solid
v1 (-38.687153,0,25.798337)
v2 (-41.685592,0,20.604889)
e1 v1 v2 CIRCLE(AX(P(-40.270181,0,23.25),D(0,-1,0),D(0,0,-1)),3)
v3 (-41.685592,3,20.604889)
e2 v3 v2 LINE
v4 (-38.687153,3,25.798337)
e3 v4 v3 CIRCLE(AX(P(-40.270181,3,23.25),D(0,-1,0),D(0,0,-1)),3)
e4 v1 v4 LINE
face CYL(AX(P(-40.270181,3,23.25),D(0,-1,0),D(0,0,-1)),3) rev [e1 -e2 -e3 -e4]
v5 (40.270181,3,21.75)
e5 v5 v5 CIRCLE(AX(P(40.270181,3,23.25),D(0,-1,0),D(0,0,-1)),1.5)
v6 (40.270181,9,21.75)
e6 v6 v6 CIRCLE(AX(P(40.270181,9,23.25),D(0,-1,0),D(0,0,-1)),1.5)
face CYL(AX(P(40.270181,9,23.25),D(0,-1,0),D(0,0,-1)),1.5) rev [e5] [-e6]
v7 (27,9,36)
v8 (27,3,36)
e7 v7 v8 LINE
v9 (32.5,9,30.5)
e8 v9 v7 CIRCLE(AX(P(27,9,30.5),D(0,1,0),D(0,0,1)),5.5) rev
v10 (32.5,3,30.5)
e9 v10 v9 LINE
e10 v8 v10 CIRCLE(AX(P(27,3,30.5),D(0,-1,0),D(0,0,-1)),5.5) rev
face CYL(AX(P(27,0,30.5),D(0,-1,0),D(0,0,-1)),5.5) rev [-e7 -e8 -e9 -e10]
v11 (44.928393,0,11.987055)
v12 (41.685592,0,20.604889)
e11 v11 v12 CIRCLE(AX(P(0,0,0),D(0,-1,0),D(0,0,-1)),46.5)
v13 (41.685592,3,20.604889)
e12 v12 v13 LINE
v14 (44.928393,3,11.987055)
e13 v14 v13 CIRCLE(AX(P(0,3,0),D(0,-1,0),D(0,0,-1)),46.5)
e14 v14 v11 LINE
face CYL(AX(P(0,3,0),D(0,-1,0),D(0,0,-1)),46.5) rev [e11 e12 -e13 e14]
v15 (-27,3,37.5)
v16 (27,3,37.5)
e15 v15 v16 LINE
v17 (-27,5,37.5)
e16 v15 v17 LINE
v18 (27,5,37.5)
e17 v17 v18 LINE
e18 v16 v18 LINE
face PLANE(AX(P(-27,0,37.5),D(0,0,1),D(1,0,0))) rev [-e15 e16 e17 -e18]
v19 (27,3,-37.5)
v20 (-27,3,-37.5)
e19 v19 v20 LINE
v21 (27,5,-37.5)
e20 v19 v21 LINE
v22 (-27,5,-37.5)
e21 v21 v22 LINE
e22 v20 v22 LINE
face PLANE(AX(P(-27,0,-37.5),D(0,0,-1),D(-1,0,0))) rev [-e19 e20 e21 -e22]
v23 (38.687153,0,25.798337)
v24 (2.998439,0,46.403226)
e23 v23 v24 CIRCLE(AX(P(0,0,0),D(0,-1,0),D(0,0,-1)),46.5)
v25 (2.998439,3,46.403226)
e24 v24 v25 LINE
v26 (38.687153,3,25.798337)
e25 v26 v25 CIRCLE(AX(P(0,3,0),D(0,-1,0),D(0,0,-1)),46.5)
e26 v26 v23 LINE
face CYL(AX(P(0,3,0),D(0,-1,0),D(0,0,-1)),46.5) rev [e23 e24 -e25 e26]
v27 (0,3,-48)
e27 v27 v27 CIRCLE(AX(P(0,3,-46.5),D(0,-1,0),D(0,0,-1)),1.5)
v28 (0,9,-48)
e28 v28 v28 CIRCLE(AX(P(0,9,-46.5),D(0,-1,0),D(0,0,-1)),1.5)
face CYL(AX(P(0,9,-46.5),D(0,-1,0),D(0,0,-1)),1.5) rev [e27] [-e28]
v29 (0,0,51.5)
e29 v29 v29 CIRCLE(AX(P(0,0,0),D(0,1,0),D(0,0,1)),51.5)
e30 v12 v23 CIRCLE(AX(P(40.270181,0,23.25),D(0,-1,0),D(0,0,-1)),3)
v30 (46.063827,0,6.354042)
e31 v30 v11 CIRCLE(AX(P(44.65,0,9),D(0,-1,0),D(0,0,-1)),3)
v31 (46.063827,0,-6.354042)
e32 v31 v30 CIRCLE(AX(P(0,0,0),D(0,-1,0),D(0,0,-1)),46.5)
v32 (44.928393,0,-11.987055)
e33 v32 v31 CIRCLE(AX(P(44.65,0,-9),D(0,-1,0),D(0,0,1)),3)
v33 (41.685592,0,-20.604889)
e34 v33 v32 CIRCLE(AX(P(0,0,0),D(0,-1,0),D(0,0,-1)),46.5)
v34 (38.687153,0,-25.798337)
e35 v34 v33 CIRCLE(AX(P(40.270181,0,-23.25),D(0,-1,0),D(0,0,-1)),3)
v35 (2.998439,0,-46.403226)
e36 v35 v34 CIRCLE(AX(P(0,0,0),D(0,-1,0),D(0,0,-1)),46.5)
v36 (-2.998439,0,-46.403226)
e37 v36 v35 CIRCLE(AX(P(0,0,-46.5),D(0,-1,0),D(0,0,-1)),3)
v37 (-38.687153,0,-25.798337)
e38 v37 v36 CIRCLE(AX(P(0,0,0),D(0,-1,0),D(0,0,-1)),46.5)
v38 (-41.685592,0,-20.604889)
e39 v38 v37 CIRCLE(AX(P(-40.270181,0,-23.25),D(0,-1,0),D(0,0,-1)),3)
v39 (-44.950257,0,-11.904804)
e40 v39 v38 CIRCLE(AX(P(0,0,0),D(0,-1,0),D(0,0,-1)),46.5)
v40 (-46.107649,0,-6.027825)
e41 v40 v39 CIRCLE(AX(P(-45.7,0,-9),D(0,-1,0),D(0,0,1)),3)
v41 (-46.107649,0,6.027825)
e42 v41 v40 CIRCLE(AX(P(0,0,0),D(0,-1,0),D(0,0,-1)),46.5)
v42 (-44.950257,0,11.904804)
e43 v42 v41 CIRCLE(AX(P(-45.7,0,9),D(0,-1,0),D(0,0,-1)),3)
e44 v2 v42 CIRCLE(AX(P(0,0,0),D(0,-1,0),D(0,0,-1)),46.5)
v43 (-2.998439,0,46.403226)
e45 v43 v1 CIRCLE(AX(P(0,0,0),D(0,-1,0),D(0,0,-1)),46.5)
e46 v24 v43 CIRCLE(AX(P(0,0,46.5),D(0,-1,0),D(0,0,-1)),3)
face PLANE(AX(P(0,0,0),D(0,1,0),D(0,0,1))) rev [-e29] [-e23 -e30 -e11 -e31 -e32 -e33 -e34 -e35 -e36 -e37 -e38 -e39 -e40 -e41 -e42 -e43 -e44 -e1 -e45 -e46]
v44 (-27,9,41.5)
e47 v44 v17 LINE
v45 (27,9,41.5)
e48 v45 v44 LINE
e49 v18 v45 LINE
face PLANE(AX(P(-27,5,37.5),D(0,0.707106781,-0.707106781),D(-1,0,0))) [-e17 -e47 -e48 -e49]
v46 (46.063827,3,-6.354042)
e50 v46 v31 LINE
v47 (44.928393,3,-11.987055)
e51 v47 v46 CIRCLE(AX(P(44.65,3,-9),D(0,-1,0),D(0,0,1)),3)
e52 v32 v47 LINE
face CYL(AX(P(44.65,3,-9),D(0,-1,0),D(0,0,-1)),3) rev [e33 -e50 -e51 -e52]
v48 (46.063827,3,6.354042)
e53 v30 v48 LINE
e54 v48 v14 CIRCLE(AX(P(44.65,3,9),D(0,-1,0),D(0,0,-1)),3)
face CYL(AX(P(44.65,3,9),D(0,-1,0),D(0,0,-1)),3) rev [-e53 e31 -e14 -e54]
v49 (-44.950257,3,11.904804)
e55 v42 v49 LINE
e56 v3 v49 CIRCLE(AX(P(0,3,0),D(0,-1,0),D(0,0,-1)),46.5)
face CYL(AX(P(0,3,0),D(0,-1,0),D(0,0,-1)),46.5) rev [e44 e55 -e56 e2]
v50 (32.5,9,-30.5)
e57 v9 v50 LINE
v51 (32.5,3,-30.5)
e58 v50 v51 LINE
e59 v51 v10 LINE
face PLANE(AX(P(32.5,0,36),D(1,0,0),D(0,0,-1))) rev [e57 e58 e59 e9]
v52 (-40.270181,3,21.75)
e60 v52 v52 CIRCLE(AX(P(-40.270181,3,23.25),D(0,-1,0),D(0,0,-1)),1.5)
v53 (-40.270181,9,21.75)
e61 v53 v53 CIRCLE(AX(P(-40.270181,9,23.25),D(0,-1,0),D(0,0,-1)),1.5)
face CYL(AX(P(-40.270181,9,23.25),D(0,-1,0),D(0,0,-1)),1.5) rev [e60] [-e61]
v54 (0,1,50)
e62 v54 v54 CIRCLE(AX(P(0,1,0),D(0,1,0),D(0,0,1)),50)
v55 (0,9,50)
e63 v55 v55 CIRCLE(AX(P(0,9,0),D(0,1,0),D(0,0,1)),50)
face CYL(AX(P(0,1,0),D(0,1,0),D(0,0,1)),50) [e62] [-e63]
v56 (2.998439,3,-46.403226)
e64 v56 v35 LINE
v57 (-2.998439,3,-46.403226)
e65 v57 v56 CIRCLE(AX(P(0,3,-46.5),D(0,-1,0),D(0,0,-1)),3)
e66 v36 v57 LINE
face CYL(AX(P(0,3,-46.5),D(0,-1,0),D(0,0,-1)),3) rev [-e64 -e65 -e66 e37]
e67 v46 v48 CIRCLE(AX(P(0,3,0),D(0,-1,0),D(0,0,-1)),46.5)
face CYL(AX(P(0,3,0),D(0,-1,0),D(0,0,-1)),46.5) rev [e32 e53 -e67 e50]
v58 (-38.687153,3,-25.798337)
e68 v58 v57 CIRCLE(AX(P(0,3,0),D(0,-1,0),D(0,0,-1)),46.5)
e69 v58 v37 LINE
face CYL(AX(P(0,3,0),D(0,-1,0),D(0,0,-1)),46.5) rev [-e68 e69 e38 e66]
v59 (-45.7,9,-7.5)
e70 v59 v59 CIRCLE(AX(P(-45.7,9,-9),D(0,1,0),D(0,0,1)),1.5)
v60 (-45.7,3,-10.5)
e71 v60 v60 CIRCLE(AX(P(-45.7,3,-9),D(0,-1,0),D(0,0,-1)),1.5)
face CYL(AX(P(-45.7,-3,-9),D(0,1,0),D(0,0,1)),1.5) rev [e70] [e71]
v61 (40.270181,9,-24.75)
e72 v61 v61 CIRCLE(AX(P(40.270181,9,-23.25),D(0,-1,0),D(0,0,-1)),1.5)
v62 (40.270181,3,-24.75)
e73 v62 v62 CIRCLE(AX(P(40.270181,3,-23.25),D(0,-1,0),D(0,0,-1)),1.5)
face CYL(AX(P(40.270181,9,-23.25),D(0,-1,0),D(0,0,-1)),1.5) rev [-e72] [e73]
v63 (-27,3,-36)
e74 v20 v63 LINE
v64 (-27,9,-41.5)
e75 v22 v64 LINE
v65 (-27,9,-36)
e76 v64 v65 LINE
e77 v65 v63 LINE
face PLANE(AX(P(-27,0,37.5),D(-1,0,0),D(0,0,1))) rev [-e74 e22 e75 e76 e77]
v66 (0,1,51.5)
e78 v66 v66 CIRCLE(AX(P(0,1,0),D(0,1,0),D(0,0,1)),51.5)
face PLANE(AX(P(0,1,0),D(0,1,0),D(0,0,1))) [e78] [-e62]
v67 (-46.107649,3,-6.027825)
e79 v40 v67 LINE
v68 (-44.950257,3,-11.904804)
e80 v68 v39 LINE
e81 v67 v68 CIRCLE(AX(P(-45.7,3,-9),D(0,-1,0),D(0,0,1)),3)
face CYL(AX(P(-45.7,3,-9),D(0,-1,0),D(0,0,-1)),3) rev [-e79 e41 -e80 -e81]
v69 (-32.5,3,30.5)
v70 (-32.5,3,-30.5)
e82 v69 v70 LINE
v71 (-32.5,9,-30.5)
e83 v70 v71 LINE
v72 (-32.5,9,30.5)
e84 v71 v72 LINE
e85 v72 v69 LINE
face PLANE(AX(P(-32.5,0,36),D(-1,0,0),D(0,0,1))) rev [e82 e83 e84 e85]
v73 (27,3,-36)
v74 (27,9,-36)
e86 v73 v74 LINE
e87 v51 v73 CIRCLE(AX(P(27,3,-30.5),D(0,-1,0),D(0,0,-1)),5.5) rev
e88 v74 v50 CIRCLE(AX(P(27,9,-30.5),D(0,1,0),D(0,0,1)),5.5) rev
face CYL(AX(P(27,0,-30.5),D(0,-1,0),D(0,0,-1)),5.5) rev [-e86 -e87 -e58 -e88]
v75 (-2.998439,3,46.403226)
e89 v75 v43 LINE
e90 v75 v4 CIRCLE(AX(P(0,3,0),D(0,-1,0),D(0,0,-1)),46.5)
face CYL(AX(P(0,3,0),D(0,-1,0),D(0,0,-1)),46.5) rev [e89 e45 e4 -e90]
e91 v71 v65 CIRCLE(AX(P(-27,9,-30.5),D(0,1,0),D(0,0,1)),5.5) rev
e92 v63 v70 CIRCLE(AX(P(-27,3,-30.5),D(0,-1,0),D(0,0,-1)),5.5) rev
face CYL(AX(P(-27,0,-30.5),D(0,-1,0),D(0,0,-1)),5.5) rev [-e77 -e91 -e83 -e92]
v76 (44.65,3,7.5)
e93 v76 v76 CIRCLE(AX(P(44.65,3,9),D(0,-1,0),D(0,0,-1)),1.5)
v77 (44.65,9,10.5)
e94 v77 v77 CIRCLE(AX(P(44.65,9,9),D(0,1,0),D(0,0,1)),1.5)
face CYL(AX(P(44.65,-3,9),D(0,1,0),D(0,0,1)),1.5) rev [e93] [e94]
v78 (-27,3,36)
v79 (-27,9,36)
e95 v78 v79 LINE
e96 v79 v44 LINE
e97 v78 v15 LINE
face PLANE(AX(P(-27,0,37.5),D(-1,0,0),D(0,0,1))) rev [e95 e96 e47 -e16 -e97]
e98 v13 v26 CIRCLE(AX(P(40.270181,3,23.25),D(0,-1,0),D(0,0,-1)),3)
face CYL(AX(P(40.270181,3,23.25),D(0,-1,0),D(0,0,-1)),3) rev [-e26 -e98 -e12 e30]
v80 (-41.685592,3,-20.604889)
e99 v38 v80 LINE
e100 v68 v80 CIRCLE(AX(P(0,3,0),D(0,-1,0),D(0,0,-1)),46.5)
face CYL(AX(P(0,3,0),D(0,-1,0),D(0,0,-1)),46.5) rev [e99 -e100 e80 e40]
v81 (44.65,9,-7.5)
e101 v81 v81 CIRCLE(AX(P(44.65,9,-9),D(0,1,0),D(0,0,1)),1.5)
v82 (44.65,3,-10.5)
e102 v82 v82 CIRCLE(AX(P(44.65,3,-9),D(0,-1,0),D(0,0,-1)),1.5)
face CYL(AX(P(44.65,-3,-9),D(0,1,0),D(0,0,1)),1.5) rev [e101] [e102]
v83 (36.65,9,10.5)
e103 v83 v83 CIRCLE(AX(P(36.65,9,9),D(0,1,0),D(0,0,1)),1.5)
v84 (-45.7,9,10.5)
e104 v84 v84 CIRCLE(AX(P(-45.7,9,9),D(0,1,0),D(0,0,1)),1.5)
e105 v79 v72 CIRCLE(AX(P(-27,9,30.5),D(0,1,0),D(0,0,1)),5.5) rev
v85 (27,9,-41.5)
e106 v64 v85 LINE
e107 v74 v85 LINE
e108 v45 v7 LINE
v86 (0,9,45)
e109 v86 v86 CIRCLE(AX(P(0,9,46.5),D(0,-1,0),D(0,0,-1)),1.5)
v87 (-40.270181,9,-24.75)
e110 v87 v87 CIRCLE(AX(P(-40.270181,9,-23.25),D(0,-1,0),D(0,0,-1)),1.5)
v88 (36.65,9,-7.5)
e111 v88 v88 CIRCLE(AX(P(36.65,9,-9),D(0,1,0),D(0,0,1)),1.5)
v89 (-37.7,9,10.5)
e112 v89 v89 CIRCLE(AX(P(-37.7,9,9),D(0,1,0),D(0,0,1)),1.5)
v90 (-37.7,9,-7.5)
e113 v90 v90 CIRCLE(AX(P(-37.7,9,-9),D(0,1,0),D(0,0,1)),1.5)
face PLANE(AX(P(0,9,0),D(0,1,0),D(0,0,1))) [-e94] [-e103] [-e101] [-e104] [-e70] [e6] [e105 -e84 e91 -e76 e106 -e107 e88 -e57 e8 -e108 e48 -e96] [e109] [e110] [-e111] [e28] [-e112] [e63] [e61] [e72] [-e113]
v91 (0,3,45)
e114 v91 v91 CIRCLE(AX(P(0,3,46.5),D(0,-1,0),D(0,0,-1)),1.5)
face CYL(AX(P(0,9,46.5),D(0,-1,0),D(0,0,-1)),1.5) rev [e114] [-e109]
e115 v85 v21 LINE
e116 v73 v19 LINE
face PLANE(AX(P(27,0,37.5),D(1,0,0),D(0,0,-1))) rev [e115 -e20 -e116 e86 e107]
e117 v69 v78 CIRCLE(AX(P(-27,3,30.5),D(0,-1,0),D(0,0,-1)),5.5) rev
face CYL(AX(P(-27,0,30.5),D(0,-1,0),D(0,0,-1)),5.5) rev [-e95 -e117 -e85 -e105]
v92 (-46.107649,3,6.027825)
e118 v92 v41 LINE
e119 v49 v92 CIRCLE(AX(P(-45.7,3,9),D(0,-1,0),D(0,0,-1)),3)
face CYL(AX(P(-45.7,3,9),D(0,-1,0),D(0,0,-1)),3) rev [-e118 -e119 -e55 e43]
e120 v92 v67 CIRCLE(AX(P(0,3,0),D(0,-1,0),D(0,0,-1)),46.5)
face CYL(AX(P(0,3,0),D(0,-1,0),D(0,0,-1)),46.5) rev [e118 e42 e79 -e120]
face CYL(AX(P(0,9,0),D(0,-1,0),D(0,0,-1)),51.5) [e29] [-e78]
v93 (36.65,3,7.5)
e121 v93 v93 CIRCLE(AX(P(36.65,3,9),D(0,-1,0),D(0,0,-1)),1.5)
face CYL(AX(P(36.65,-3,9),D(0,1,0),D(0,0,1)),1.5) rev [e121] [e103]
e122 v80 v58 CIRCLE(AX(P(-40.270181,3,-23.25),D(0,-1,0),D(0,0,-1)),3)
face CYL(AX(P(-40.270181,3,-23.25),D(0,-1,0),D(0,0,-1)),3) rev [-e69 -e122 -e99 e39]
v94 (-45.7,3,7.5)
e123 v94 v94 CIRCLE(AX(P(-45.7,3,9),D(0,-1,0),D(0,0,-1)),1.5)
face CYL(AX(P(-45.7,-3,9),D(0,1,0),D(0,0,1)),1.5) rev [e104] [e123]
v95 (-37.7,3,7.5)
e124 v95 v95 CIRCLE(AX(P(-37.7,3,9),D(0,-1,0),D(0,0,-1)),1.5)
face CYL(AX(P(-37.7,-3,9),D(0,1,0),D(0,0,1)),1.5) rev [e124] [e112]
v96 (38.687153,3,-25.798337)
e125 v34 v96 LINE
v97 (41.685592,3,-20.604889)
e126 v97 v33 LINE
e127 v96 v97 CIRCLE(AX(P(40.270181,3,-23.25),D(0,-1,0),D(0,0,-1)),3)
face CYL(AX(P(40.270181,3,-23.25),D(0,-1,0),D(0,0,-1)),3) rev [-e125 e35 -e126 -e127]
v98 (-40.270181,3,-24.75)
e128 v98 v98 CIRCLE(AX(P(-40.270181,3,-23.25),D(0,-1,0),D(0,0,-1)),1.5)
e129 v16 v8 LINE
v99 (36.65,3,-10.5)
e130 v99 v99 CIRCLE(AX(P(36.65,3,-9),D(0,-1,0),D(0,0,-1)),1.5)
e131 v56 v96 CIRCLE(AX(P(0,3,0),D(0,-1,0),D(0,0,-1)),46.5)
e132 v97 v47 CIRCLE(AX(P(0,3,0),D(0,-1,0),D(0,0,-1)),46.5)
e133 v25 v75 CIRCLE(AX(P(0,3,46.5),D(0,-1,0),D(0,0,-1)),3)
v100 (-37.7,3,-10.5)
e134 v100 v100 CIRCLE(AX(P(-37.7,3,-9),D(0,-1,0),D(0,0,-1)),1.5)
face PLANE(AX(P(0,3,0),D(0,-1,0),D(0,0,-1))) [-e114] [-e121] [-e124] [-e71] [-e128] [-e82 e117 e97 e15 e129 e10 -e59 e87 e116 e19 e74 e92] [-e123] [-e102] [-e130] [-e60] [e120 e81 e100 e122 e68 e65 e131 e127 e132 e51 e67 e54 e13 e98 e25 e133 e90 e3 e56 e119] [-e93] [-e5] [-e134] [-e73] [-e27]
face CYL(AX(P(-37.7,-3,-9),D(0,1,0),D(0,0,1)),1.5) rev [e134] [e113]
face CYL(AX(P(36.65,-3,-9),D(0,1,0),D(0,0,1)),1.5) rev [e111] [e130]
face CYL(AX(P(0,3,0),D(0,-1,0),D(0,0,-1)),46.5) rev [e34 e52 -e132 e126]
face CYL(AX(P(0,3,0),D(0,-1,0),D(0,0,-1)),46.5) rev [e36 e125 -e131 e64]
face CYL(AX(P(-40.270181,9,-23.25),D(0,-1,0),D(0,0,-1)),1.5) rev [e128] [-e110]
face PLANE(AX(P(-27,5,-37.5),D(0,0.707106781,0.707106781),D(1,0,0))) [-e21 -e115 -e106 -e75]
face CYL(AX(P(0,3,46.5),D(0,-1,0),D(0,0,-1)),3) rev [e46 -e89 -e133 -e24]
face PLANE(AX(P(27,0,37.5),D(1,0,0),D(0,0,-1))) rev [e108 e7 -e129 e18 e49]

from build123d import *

# Parameters (mm, degrees)
SKETCH_1_R           = 51.5
SKETCH_1_R_2         = 25
EXTRUDE_1_DEPTH      = 9
CUT_EXTRUDE_START    = -8
SKETCH_12_R          = 51.5
SKETCH_12_R_2        = 50
CUT_EXTRUDE_11_DEPTH = 8
SKETCH_3_W           = 54
SKETCH_3_H           = 75
CUT_EXTRUDE_2_DEPTH  = 74.385965961
CHAMFER_1_SIZE       = 4
SKETCH_4_R           = 46.5
CUT_EXTRUDE_3_DEPTH  = 3
SKETCH_7_R           = 1.5
CUT_EXTRUDE_6_DEPTH  = 74.385965961
SKETCH_8_R           = 3
CUT_EXTRUDE_7_DEPTH  = 3
SKETCH_11_W          = 65
SKETCH_11_H          = 72
CUT_EXTRUDE_10_DEPTH = 74.385965961
FILLET_1_R           = 5.5
SKETCH_13_R          = 1.5
CUT_EXTRUDE_12_DEPTH = 20
SKETCH_14_R          = 3
CUT_EXTRUDE_13_DEPTH = 3


with BuildPart() as part:
    # 草图1 → 凸台-拉伸1 (new body)
    with BuildSketch(Plane(origin=(0, 0, 0), x_dir=(1, 0, 0), z_dir=(0, 1, 0))):
        with Locations(Location((0, 0, 0), (0, 0, 270))):
            Circle(SKETCH_1_R)
        with Locations(Location((0, 0, 0), (0, 0, 270))):
            Circle(SKETCH_1_R_2, mode=Mode.SUBTRACT)
    extrude(amount=EXTRUDE_1_DEPTH)

    # 草图12 → 切除-拉伸11 (cut)
    with BuildSketch(Plane(origin=(0, 9, 0), x_dir=(1, 0, 0), z_dir=(0, 1, 0)).offset(CUT_EXTRUDE_START)):
        with Locations(Location((0, 0, 0), (0, 0, 270))):
            Circle(SKETCH_12_R)
        with Locations(Location((0, 0, 0), (0, 0, 270))):
            Circle(SKETCH_12_R_2, mode=Mode.SUBTRACT)
    extrude(amount=CUT_EXTRUDE_11_DEPTH, mode=Mode.SUBTRACT)

    # 草图3 → 切除-拉伸2 (cut, through all)
    with BuildSketch(Plane(origin=(0, 9, 0), x_dir=(1, 0, 0), z_dir=(0, 1, 0))):
        Rectangle(SKETCH_3_W, SKETCH_3_H)
    extrude(amount=-CUT_EXTRUDE_2_DEPTH, mode=Mode.SUBTRACT)

    # 倒角1
    chamfer_1_edges = [part.edges().sort_by_distance(p)[0] for p in [
        (0, 9, -37.5),
        (0, 9, 37.5),
    ]]
    chamfer(chamfer_1_edges, length=CHAMFER_1_SIZE)

    # 草图4 → 切除-拉伸3 (cut)
    with BuildSketch(Plane.XZ):
        with Locations(Location((0, 0, 0), (0, 0, 270))):
            Circle(SKETCH_4_R)
    extrude(amount=-CUT_EXTRUDE_3_DEPTH, mode=Mode.SUBTRACT)

    # 草图7 → 切除-拉伸6 (cut, through all)
    with BuildSketch(Plane.XZ):
        with Locations(Location((0, 46.5, 0), (0, 0, 270))):
            Circle(SKETCH_7_R)
        with Locations(Location((40.270181276, 23.25, 0), (0, 0, 270))):
            Circle(SKETCH_7_R)
        with Locations(Location((40.270181276, -23.25, 0), (0, 0, 270))):
            Circle(SKETCH_7_R)
        with Locations(Location((0, -46.5, 0), (0, 0, 270))):
            Circle(SKETCH_7_R)
        with Locations(Location((-40.270181276, -23.25, 0), (0, 0, 270))):
            Circle(SKETCH_7_R)
        with Locations(Location((-40.270181276, 23.25, 0), (0, 0, 270))):
            Circle(SKETCH_7_R)
    extrude(amount=-CUT_EXTRUDE_6_DEPTH, mode=Mode.SUBTRACT)

    # 草图8 → 切除-拉伸7 (cut)
    with BuildSketch(Plane.XZ):
        with Locations((0, 46.5)):
            Circle(SKETCH_8_R)
        with Locations((40.270181276, 23.25)):
            Circle(SKETCH_8_R)
        with Locations((40.270181276, -23.25)):
            Circle(SKETCH_8_R)
        with Locations((0, -46.5)):
            Circle(SKETCH_8_R)
        with Locations((-40.270181276, -23.25)):
            Circle(SKETCH_8_R)
        with Locations((-40.270181276, 23.25)):
            Circle(SKETCH_8_R)
    extrude(amount=-CUT_EXTRUDE_7_DEPTH, mode=Mode.SUBTRACT)

    # 草图11 → 切除-拉伸10 (cut, through all)
    with BuildSketch(Plane(origin=(0, 9, 0), x_dir=(1, 0, 0), z_dir=(0, 1, 0))):
        Rectangle(SKETCH_11_W, SKETCH_11_H)
    extrude(amount=-CUT_EXTRUDE_10_DEPTH, mode=Mode.SUBTRACT)

    # 圆角1
    # the kernel refuses this fillet: 5.5 mm, written as the material it adds along each edge
    with BuildSketch(Plane(origin=(-32.5, 9, 36), x_dir=(1, 0, 0), z_dir=(0, -1, 0))) as fillet_1_piece_1_section:
        with BuildLine():
            CenterArc((FILLET_1_R, -FILLET_1_R), FILLET_1_R, 90, 90)
            Line((0, -FILLET_1_R), (0, 0))
            Line((0, 0), (FILLET_1_R, 0))
        make_face()
    fillet_1_piece_1 = extrude(amount=9, mode=Mode.PRIVATE)
    fillet_1_piece_1 = split(fillet_1_piece_1, bisect_by=Plane(origin=(-30.907548225, 3, 34.407548225), z_dir=(0, 1, 0)), keep=Keep.TOP, mode=Mode.PRIVATE)
    fillet_1_piece_1 = fillet_1_piece_1 & Plane(origin=(0, 6, 0), x_dir=(0, 0, -1), z_dir=(0, -1, 0)) * Cylinder(46.5, 40, mode=Mode.PRIVATE)
    add(fillet_1_piece_1)
    with BuildSketch(Plane(origin=(-32.5, 9, 36), x_dir=(1, 0, 0), z_dir=(0, -1, 0))) as fillet_1_piece_2_section:
        with BuildLine():
            CenterArc((FILLET_1_R, -FILLET_1_R), FILLET_1_R, 90, 90)
            Line((0, -FILLET_1_R), (0, 0))
            Line((0, 0), (FILLET_1_R, 0))
        make_face()
    fillet_1_piece_2 = extrude(amount=9, mode=Mode.PRIVATE)
    fillet_1_piece_2 = split(fillet_1_piece_2, bisect_by=Plane(origin=(-31.523516263, 3, 35.138738602), z_dir=(0, 1, 0)), keep=Keep.TOP, mode=Mode.PRIVATE)
    fillet_1_piece_2 = fillet_1_piece_2 - Plane(origin=(0, 6, 0), x_dir=(0, 0, -1), z_dir=(0, -1, 0)) * Cylinder(46.5, 40, mode=Mode.PRIVATE)
    add(fillet_1_piece_2)
    with BuildSketch(Plane(origin=(-32.5, 9, 36), x_dir=(1, 0, 0), z_dir=(0, -1, 0))) as fillet_1_piece_3_section:
        with BuildLine():
            CenterArc((FILLET_1_R, -FILLET_1_R), FILLET_1_R, 90, 90)
            Line((0, -FILLET_1_R), (0, 0))
            Line((0, 0), (FILLET_1_R, 0))
        make_face()
    fillet_1_piece_3 = extrude(amount=9, mode=Mode.PRIVATE)
    fillet_1_piece_3 = split(fillet_1_piece_3, bisect_by=Plane(origin=(-31.523516263, 3, 35.138738602), z_dir=(0, -1, 0)), keep=Keep.TOP, mode=Mode.PRIVATE)
    fillet_1_piece_3 = fillet_1_piece_3 - Plane(origin=(0, 1.5, 0), x_dir=(0, 0, -1), z_dir=(0, -1, 0)) * Cylinder(46.5, 40, mode=Mode.PRIVATE)
    add(fillet_1_piece_3)
    with BuildSketch(Plane(origin=(32.5, 9, 36), x_dir=(-1, 0, 0), z_dir=(0, -1, 0))) as fillet_1_piece_4_section:
        with BuildLine():
            CenterArc((FILLET_1_R, FILLET_1_R), FILLET_1_R, 180, 90)
            Line((0, FILLET_1_R), (0, 0))
            Line((0, 0), (FILLET_1_R, 0))
        make_face()
    fillet_1_piece_4 = extrude(amount=9, mode=Mode.PRIVATE)
    fillet_1_piece_4 = split(fillet_1_piece_4, bisect_by=Plane(origin=(30.907548225, 3, 34.407548225), z_dir=(0, 1, 0)), keep=Keep.TOP, mode=Mode.PRIVATE)
    fillet_1_piece_4 = fillet_1_piece_4 & Plane(origin=(0, 6, 0), x_dir=(0, 0, -1), z_dir=(0, -1, 0)) * Cylinder(46.5, 40, mode=Mode.PRIVATE)
    add(fillet_1_piece_4)
    with BuildSketch(Plane(origin=(32.5, 9, 36), x_dir=(-1, 0, 0), z_dir=(0, -1, 0))) as fillet_1_piece_5_section:
        with BuildLine():
            CenterArc((FILLET_1_R, FILLET_1_R), FILLET_1_R, 180, 90)
            Line((0, FILLET_1_R), (0, 0))
            Line((0, 0), (FILLET_1_R, 0))
        make_face()
    fillet_1_piece_5 = extrude(amount=9, mode=Mode.PRIVATE)
    fillet_1_piece_5 = split(fillet_1_piece_5, bisect_by=Plane(origin=(31.523516263, 3, 35.138738602), z_dir=(0, 1, 0)), keep=Keep.TOP, mode=Mode.PRIVATE)
    fillet_1_piece_5 = fillet_1_piece_5 - Plane(origin=(0, 6, 0), x_dir=(0, 0, -1), z_dir=(0, -1, 0)) * Cylinder(46.5, 40, mode=Mode.PRIVATE)
    add(fillet_1_piece_5)
    with BuildSketch(Plane(origin=(32.5, 9, 36), x_dir=(-1, 0, 0), z_dir=(0, -1, 0))) as fillet_1_piece_6_section:
        with BuildLine():
            CenterArc((FILLET_1_R, FILLET_1_R), FILLET_1_R, 180, 90)
            Line((0, FILLET_1_R), (0, 0))
            Line((0, 0), (FILLET_1_R, 0))
        make_face()
    fillet_1_piece_6 = extrude(amount=9, mode=Mode.PRIVATE)
    fillet_1_piece_6 = split(fillet_1_piece_6, bisect_by=Plane(origin=(31.523516263, 3, 35.138738602), z_dir=(0, -1, 0)), keep=Keep.TOP, mode=Mode.PRIVATE)
    fillet_1_piece_6 = fillet_1_piece_6 - Plane(origin=(0, 1.5, 0), x_dir=(0, 0, -1), z_dir=(0, -1, 0)) * Cylinder(46.5, 40, mode=Mode.PRIVATE)
    add(fillet_1_piece_6)
    with BuildSketch(Plane(origin=(32.5, 9, -36), x_dir=(0, 0, 1), z_dir=(0, -1, 0))) as fillet_1_piece_7_section:
        with BuildLine():
            CenterArc((FILLET_1_R, FILLET_1_R), FILLET_1_R, 180, 90)
            Line((0, FILLET_1_R), (0, 0))
            Line((0, 0), (FILLET_1_R, 0))
        make_face()
    fillet_1_piece_7 = extrude(amount=9, mode=Mode.PRIVATE)
    fillet_1_piece_7 = fillet_1_piece_7 & Plane(origin=(0, 6, 0), x_dir=(0, 0, -1), z_dir=(0, -1, 0)) * Cylinder(46.5, 40, mode=Mode.PRIVATE)
    fillet_1_piece_7 = split(fillet_1_piece_7, bisect_by=Plane(origin=(30.907548225, 3, -34.407548225), z_dir=(0, 1, 0)), keep=Keep.TOP, mode=Mode.PRIVATE)
    add(fillet_1_piece_7)
    with BuildSketch(Plane(origin=(32.5, 9, -36), x_dir=(0, 0, 1), z_dir=(0, -1, 0))) as fillet_1_piece_8_section:
        with BuildLine():
            CenterArc((FILLET_1_R, FILLET_1_R), FILLET_1_R, 180, 90)
            Line((0, FILLET_1_R), (0, 0))
            Line((0, 0), (FILLET_1_R, 0))
        make_face()
    fillet_1_piece_8 = extrude(amount=9, mode=Mode.PRIVATE)
    fillet_1_piece_8 = fillet_1_piece_8 - Plane(origin=(0, 6, 0), x_dir=(0, 0, -1), z_dir=(0, -1, 0)) * Cylinder(46.5, 40, mode=Mode.PRIVATE)
    fillet_1_piece_8 = split(fillet_1_piece_8, bisect_by=Plane(origin=(31.523516263, 3, -35.138738602), z_dir=(0, 1, 0)), keep=Keep.TOP, mode=Mode.PRIVATE)
    add(fillet_1_piece_8)
    with BuildSketch(Plane(origin=(32.5, 9, -36), x_dir=(0, 0, 1), z_dir=(0, -1, 0))) as fillet_1_piece_9_section:
        with BuildLine():
            CenterArc((FILLET_1_R, FILLET_1_R), FILLET_1_R, 180, 90)
            Line((0, FILLET_1_R), (0, 0))
            Line((0, 0), (FILLET_1_R, 0))
        make_face()
    fillet_1_piece_9 = extrude(amount=9, mode=Mode.PRIVATE)
    fillet_1_piece_9 = fillet_1_piece_9 - Plane(origin=(0, 1.5, 0), x_dir=(0, 0, -1), z_dir=(0, -1, 0)) * Cylinder(46.5, 40, mode=Mode.PRIVATE)
    fillet_1_piece_9 = split(fillet_1_piece_9, bisect_by=Plane(origin=(31.523516263, 3, -35.138738602), z_dir=(0, -1, 0)), keep=Keep.TOP, mode=Mode.PRIVATE)
    add(fillet_1_piece_9)
    with BuildSketch(Plane(origin=(-32.5, 9, -36), x_dir=(1, 0, 0), z_dir=(0, -1, 0))) as fillet_1_piece_10_section:
        with BuildLine():
            CenterArc((FILLET_1_R, FILLET_1_R), FILLET_1_R, 180, 90)
            Line((0, FILLET_1_R), (0, 0))
            Line((0, 0), (FILLET_1_R, 0))
        make_face()
    fillet_1_piece_10 = extrude(amount=9, mode=Mode.PRIVATE)
    fillet_1_piece_10 = fillet_1_piece_10 & Plane(origin=(0, 6, 0), x_dir=(0, 0, -1), z_dir=(0, -1, 0)) * Cylinder(46.5, 40, mode=Mode.PRIVATE)
    fillet_1_piece_10 = split(fillet_1_piece_10, bisect_by=Plane(origin=(-30.907548225, 3, -34.407548225), z_dir=(0, 1, 0)), keep=Keep.TOP, mode=Mode.PRIVATE)
    add(fillet_1_piece_10)
    with BuildSketch(Plane(origin=(-32.5, 9, -36), x_dir=(1, 0, 0), z_dir=(0, -1, 0))) as fillet_1_piece_11_section:
        with BuildLine():
            CenterArc((FILLET_1_R, FILLET_1_R), FILLET_1_R, 180, 90)
            Line((0, FILLET_1_R), (0, 0))
            Line((0, 0), (FILLET_1_R, 0))
        make_face()
    fillet_1_piece_11 = extrude(amount=9, mode=Mode.PRIVATE)
    fillet_1_piece_11 = fillet_1_piece_11 - Plane(origin=(0, 6, 0), x_dir=(0, 0, -1), z_dir=(0, -1, 0)) * Cylinder(46.5, 40, mode=Mode.PRIVATE)
    fillet_1_piece_11 = split(fillet_1_piece_11, bisect_by=Plane(origin=(-31.523516263, 3, -35.138738602), z_dir=(0, 1, 0)), keep=Keep.TOP, mode=Mode.PRIVATE)
    add(fillet_1_piece_11)
    with BuildSketch(Plane(origin=(-32.5, 9, -36), x_dir=(1, 0, 0), z_dir=(0, -1, 0))) as fillet_1_piece_12_section:
        with BuildLine():
            CenterArc((FILLET_1_R, FILLET_1_R), FILLET_1_R, 180, 90)
            Line((0, FILLET_1_R), (0, 0))
            Line((0, 0), (FILLET_1_R, 0))
        make_face()
    fillet_1_piece_12 = extrude(amount=9, mode=Mode.PRIVATE)
    fillet_1_piece_12 = fillet_1_piece_12 - Plane(origin=(0, 1.5, 0), x_dir=(0, 0, -1), z_dir=(0, -1, 0)) * Cylinder(46.5, 40, mode=Mode.PRIVATE)
    fillet_1_piece_12 = split(fillet_1_piece_12, bisect_by=Plane(origin=(-31.523516263, 3, -35.138738602), z_dir=(0, -1, 0)), keep=Keep.TOP, mode=Mode.PRIVATE)
    add(fillet_1_piece_12)

    # 草图13 → 切除-拉伸12 (cut)
    with BuildSketch(Plane(origin=(90.573916545, 17, 197.95666402), x_dir=(0.9918515590673906, 0, 0.1273989198368124), z_dir=(0, 1, 0))):
        with Locations(Location((-161.529552035, 187.909140098, 0), (0, 0, 277.319311568))):
            Circle(SKETCH_13_R)
        with Locations(Location((-153.594739562, 188.928331456, 0), (0, 0, 277.319311568))):
            Circle(SKETCH_13_R)
        with Locations(Location((-159.236371478, 170.055812034, 0), (0, 0, 277.319311568))):
            Circle(SKETCH_13_R)
        with Locations(Location((-151.301559005, 171.075003393, 0), (0, 0, 277.319311568))):
            Circle(SKETCH_13_R)
        with Locations(Location((-79.850576146, 198.400441146, 0), (0, 0, 277.319311568))):
            Circle(SKETCH_13_R)
        with Locations(Location((-71.915763673, 199.419632505, 0), (0, 0, 277.319311568))):
            Circle(SKETCH_13_R)
        with Locations(Location((-77.557395589, 180.547113083, 0), (0, 0, 277.319311568))):
            Circle(SKETCH_13_R)
        with Locations(Location((-69.622583116, 181.566304442, 0), (0, 0, 277.319311568))):
            Circle(SKETCH_13_R)
    extrude(amount=-CUT_EXTRUDE_12_DEPTH, mode=Mode.SUBTRACT)

    # 草图14 → 切除-拉伸13 (cut)
    with BuildSketch(Plane.XZ):
        with Locations((-45.7, 9)):
            Circle(SKETCH_14_R)
        with Locations((44.65, 9)):
            Circle(SKETCH_14_R)
        with Locations((-45.7, -9)):
            Circle(SKETCH_14_R)
        with Locations((44.65, -9)):
            Circle(SKETCH_14_R)
    extrude(amount=-CUT_EXTRUDE_13_DEPTH, mode=Mode.SUBTRACT)


solid = part.part
